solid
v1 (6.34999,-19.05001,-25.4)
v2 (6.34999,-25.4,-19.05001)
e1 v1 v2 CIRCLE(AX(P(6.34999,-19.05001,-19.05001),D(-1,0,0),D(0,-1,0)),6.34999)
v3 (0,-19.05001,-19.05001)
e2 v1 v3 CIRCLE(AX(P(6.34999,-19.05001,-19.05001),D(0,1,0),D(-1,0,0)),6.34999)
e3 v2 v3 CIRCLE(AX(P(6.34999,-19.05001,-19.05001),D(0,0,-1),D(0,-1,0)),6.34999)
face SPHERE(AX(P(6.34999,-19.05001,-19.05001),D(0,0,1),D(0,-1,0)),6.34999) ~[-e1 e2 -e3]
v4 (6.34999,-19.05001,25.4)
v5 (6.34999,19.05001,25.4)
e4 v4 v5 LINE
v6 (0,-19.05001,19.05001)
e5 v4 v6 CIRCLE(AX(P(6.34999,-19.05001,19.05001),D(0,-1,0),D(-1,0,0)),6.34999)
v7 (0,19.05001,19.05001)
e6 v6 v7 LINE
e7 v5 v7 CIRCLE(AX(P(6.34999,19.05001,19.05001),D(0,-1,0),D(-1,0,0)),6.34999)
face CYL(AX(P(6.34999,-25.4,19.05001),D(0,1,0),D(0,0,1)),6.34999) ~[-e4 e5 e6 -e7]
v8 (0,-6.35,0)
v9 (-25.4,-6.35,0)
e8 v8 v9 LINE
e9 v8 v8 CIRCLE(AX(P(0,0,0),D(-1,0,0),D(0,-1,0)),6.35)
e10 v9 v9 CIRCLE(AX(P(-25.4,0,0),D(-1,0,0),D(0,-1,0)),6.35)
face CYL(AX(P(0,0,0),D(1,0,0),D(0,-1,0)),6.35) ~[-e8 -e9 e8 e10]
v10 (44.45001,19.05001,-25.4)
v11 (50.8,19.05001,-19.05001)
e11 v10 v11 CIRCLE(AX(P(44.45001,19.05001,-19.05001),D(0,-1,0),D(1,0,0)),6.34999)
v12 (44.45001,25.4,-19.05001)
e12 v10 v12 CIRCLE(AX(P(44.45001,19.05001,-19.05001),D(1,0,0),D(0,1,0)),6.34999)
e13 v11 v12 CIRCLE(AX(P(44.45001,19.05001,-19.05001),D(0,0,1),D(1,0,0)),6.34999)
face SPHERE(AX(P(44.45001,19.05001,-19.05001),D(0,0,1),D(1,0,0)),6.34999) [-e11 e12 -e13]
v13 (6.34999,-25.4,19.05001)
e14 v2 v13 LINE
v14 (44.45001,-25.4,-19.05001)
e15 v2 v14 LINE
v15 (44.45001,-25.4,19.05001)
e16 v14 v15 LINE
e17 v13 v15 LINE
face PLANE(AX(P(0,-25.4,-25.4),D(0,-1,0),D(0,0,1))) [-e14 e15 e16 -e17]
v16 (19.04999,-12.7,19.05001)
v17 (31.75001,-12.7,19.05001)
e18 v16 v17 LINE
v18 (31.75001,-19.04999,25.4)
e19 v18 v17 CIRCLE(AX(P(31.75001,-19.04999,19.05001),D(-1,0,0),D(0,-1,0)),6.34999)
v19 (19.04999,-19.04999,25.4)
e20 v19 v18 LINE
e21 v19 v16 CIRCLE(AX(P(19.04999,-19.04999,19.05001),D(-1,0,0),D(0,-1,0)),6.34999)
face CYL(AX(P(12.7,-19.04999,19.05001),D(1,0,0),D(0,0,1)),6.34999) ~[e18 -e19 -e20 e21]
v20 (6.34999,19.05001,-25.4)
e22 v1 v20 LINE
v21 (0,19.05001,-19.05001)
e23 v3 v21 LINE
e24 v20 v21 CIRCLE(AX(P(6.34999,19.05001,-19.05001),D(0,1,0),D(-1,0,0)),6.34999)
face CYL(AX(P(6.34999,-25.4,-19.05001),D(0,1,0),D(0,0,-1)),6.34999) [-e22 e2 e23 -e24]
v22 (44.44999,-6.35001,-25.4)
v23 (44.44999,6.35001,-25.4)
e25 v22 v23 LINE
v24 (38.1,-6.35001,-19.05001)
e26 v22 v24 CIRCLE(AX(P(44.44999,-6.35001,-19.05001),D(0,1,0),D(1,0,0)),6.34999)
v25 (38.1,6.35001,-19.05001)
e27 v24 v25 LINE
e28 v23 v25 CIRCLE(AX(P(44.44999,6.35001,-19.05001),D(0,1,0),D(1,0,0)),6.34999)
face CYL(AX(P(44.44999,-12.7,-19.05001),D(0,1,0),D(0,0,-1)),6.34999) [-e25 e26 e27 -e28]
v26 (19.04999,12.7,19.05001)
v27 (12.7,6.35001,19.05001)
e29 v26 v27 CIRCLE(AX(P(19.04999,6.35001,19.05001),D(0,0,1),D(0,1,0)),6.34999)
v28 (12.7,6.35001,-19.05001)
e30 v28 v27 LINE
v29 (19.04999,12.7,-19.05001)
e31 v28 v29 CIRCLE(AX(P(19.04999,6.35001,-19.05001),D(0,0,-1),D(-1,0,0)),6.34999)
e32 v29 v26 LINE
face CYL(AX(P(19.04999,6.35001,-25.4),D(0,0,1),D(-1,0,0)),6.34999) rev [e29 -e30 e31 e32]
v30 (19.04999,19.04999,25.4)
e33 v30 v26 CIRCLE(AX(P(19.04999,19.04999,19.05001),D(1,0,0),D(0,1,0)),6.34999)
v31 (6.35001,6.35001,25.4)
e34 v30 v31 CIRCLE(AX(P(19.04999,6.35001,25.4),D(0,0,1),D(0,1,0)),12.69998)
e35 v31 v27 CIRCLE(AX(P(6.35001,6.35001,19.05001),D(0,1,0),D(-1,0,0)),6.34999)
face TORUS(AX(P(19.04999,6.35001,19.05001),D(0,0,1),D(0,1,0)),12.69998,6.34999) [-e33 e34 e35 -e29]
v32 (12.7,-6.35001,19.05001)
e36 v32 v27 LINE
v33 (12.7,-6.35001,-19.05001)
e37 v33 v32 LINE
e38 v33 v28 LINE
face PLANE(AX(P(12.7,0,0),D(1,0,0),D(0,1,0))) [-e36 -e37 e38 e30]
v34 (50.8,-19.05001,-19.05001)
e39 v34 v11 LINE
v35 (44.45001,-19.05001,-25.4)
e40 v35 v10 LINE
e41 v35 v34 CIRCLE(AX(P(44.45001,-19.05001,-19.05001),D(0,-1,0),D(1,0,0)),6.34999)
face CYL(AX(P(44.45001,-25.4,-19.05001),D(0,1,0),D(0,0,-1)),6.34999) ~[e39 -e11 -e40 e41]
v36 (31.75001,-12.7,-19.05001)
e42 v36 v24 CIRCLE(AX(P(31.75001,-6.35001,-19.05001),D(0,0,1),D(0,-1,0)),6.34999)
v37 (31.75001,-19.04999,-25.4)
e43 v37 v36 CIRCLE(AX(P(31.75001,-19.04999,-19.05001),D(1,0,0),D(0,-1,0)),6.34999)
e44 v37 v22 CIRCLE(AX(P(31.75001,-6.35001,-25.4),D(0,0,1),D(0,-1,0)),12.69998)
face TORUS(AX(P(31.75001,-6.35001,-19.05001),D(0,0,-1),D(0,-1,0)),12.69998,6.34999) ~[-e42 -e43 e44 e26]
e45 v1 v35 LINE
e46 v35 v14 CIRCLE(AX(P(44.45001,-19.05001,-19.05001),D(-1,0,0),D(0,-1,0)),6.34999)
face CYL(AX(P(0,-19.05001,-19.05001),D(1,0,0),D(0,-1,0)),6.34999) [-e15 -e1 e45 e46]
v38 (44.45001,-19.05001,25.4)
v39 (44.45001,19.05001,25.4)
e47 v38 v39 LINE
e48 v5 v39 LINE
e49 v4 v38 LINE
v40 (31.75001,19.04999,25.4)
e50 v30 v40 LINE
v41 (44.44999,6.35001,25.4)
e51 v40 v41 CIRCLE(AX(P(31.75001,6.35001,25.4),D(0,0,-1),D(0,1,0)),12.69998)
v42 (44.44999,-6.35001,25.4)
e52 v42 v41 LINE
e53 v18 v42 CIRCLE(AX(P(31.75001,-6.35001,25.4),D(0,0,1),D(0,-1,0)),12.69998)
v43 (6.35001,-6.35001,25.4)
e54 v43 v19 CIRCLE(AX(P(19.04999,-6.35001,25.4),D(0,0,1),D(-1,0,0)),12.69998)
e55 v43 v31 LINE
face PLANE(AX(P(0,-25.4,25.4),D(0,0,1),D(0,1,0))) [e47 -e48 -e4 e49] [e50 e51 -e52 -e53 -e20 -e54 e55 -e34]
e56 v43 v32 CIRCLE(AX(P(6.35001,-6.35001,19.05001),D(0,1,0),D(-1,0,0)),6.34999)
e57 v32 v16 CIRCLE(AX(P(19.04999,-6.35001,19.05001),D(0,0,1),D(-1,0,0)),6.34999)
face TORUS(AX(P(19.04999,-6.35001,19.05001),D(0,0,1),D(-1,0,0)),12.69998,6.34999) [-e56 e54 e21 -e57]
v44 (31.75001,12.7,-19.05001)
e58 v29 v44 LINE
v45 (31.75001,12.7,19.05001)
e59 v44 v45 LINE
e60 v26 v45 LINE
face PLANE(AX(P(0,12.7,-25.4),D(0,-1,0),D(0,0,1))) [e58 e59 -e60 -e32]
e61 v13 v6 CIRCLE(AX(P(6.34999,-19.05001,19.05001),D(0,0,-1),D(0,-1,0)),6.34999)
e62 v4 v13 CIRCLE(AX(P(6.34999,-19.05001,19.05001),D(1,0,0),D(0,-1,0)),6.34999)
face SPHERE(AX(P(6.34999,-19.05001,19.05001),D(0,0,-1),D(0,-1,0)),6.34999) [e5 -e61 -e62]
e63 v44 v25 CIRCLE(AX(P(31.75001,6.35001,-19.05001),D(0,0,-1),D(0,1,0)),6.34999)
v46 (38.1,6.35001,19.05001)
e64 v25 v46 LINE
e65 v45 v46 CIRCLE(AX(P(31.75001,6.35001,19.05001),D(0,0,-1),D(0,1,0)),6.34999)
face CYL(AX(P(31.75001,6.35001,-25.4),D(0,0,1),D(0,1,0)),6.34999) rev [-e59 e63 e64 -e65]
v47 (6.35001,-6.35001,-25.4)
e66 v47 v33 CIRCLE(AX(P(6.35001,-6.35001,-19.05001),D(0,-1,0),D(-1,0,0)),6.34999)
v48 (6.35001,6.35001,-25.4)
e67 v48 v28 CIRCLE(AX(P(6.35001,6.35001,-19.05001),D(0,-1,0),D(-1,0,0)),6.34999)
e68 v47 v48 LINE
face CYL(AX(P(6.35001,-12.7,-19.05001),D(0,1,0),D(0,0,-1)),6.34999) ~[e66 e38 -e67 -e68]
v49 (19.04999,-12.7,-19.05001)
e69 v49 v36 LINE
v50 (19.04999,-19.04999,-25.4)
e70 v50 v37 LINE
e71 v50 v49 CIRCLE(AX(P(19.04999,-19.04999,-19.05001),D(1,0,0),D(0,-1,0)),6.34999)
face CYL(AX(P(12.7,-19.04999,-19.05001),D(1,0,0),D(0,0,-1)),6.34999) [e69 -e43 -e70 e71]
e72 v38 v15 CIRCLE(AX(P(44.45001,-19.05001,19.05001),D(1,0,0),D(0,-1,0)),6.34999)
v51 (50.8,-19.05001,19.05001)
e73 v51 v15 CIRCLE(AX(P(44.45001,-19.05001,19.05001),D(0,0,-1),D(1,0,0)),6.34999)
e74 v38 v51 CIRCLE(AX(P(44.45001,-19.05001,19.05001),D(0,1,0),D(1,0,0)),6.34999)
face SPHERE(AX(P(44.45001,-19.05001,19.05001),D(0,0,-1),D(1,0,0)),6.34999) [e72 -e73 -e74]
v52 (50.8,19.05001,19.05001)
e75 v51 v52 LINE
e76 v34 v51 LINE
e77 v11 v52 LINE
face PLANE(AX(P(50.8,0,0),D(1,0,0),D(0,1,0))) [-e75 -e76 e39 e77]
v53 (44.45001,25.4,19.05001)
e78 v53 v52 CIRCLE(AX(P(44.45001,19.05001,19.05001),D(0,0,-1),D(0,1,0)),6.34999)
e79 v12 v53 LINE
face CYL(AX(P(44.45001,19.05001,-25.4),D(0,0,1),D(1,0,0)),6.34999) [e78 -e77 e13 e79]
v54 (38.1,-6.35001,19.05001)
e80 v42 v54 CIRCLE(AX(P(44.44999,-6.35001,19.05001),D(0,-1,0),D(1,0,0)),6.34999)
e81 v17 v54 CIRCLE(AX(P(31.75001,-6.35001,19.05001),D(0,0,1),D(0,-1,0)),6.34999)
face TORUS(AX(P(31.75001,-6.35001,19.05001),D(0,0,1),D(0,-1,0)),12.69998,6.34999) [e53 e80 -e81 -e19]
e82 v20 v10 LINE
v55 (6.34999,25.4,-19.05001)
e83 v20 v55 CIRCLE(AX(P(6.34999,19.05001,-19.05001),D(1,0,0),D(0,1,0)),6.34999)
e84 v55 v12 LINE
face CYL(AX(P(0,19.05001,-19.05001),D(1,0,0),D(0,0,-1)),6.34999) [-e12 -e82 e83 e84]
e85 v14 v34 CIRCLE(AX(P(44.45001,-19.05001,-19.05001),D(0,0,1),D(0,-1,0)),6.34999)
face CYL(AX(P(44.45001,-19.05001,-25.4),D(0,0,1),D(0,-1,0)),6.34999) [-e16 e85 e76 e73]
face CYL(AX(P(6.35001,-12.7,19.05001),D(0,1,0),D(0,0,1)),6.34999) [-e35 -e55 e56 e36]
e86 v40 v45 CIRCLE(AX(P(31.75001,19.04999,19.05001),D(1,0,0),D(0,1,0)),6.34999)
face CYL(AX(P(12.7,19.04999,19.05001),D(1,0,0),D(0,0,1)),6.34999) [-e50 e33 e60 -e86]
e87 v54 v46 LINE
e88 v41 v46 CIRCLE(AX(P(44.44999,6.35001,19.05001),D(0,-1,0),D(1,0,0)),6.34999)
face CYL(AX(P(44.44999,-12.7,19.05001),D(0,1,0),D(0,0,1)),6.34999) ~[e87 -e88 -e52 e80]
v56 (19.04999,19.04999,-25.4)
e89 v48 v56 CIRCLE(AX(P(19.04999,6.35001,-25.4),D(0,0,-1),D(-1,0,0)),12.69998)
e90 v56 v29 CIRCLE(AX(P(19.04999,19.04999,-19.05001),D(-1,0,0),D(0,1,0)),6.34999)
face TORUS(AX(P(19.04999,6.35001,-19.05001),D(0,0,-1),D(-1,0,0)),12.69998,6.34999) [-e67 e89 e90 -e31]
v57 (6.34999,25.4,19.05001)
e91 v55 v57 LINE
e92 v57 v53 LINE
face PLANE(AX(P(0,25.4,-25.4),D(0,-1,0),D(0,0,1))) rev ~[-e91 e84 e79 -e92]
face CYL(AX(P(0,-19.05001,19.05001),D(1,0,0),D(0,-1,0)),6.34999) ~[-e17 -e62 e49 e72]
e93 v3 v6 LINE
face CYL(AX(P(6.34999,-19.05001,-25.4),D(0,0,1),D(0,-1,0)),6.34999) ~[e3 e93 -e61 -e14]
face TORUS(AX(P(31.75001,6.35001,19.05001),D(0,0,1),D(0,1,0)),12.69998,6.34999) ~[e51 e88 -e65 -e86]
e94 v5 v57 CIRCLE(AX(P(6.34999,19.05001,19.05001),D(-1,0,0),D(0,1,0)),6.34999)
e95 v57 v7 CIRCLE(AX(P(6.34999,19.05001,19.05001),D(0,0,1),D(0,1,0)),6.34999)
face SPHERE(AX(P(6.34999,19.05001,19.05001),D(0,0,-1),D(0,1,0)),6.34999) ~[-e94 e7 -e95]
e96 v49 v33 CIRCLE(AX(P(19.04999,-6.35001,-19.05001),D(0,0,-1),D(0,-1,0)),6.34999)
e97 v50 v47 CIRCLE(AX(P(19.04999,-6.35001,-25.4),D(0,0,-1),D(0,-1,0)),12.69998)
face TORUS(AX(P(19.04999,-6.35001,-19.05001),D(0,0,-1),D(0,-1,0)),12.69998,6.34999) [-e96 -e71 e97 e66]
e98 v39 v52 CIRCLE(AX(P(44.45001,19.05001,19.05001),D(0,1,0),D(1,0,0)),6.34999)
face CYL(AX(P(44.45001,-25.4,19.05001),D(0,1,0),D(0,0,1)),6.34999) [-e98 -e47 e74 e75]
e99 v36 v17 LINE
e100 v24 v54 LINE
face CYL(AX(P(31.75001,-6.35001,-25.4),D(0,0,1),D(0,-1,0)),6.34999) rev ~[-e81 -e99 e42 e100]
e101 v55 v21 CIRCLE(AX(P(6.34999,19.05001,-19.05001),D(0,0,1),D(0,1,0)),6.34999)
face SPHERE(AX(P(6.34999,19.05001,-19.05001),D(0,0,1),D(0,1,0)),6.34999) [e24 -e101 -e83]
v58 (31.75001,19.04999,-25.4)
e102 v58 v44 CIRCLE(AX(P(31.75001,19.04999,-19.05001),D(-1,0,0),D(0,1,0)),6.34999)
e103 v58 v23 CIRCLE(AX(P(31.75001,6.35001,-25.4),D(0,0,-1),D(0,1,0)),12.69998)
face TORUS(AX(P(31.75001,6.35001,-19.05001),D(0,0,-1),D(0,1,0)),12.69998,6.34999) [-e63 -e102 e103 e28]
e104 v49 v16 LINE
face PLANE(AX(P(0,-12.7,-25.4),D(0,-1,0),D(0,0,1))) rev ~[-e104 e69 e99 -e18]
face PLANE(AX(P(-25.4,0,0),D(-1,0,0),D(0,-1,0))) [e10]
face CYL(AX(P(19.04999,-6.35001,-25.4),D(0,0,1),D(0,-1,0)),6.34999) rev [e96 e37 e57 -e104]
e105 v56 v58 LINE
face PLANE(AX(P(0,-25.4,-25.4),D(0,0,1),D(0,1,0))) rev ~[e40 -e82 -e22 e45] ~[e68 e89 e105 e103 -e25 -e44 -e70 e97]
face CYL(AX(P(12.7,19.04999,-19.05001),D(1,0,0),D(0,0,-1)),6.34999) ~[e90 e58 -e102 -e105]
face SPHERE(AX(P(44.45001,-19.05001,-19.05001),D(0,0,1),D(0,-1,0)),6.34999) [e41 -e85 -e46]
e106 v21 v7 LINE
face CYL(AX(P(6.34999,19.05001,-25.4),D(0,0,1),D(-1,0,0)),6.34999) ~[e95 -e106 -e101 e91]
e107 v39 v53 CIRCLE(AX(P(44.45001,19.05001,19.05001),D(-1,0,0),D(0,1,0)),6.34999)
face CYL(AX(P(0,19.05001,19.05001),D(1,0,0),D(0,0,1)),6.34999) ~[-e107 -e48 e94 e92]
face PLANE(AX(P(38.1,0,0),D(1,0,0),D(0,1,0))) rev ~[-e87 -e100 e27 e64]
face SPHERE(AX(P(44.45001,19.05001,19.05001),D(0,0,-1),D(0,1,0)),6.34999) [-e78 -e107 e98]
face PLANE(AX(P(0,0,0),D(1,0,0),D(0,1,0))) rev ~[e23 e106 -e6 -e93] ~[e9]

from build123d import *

# Parameters (mm, degrees)
F0_W     = 50.8
F0_H     = 50.8
F1_DEPTH = 50.8
F2_T     = -12.7
F3_R     = 6.35
F4_DEPTH = 25.4
F5_R     = 6.34999


# Not quite as in the source:
# - a fillet or chamfer is up to 0.001 mm smaller than in the source, because OpenCascade refuses the exact size


with BuildPart() as f1:
    # F0 (on Right) → F1 (new body)
    with BuildSketch(Plane.YZ):
        Rectangle(F0_W, F0_H)
    extrude(amount=F1_DEPTH)

    # F2
    f2_openings = [f1.faces().sort_by_distance(p)[0] for p in [
        (25.4, 0, 25.4),
        (25.4, 0, -25.4),
    ]]
    offset(amount=F2_T, openings=f2_openings)

    # F3 (on face) → F4 (join)
    with BuildSketch(Plane(origin=(0, 0, 0), x_dir=(0, -1, 0), z_dir=(-1, 0, 0))):
        Circle(F3_R)
    extrude(amount=F4_DEPTH)

    # F5 (radius 6.35 in the source; OpenCascade refuses exactly that, so slightly less here)
    f5_edges = [f1.edges().sort_by_distance(p)[0] for p in [
        (50.8, -25.4, 0),
        (0, -25.4, 0),
        (50.8, 25.4, 0),
        (0, 25.4, 0),
        (12.7, -12.7, 0),
        (38.1, 12.7, 0),
        (12.7, 12.7, 0),
        (38.1, -12.7, 0),
        (25.4, 25.4, 25.4),
        (50.8, 0, 25.4),
        (25.4, -25.4, 25.4),
        (0, 0, 25.4),
        (25.4, 12.7, 25.4),
        (12.7, 0, 25.4),
        (25.4, -12.7, 25.4),
        (38.1, 0, 25.4),
        (25.4, -25.4, -25.4),
        (50.8, 0, -25.4),
        (25.4, 25.4, -25.4),
        (0, 0, -25.4),
        (25.4, -12.7, -25.4),
        (12.7, 0, -25.4),
        (25.4, 12.7, -25.4),
        (38.1, 0, -25.4),
    ]]
    fillet(f5_edges, radius=F5_R)


solid = f1.part
